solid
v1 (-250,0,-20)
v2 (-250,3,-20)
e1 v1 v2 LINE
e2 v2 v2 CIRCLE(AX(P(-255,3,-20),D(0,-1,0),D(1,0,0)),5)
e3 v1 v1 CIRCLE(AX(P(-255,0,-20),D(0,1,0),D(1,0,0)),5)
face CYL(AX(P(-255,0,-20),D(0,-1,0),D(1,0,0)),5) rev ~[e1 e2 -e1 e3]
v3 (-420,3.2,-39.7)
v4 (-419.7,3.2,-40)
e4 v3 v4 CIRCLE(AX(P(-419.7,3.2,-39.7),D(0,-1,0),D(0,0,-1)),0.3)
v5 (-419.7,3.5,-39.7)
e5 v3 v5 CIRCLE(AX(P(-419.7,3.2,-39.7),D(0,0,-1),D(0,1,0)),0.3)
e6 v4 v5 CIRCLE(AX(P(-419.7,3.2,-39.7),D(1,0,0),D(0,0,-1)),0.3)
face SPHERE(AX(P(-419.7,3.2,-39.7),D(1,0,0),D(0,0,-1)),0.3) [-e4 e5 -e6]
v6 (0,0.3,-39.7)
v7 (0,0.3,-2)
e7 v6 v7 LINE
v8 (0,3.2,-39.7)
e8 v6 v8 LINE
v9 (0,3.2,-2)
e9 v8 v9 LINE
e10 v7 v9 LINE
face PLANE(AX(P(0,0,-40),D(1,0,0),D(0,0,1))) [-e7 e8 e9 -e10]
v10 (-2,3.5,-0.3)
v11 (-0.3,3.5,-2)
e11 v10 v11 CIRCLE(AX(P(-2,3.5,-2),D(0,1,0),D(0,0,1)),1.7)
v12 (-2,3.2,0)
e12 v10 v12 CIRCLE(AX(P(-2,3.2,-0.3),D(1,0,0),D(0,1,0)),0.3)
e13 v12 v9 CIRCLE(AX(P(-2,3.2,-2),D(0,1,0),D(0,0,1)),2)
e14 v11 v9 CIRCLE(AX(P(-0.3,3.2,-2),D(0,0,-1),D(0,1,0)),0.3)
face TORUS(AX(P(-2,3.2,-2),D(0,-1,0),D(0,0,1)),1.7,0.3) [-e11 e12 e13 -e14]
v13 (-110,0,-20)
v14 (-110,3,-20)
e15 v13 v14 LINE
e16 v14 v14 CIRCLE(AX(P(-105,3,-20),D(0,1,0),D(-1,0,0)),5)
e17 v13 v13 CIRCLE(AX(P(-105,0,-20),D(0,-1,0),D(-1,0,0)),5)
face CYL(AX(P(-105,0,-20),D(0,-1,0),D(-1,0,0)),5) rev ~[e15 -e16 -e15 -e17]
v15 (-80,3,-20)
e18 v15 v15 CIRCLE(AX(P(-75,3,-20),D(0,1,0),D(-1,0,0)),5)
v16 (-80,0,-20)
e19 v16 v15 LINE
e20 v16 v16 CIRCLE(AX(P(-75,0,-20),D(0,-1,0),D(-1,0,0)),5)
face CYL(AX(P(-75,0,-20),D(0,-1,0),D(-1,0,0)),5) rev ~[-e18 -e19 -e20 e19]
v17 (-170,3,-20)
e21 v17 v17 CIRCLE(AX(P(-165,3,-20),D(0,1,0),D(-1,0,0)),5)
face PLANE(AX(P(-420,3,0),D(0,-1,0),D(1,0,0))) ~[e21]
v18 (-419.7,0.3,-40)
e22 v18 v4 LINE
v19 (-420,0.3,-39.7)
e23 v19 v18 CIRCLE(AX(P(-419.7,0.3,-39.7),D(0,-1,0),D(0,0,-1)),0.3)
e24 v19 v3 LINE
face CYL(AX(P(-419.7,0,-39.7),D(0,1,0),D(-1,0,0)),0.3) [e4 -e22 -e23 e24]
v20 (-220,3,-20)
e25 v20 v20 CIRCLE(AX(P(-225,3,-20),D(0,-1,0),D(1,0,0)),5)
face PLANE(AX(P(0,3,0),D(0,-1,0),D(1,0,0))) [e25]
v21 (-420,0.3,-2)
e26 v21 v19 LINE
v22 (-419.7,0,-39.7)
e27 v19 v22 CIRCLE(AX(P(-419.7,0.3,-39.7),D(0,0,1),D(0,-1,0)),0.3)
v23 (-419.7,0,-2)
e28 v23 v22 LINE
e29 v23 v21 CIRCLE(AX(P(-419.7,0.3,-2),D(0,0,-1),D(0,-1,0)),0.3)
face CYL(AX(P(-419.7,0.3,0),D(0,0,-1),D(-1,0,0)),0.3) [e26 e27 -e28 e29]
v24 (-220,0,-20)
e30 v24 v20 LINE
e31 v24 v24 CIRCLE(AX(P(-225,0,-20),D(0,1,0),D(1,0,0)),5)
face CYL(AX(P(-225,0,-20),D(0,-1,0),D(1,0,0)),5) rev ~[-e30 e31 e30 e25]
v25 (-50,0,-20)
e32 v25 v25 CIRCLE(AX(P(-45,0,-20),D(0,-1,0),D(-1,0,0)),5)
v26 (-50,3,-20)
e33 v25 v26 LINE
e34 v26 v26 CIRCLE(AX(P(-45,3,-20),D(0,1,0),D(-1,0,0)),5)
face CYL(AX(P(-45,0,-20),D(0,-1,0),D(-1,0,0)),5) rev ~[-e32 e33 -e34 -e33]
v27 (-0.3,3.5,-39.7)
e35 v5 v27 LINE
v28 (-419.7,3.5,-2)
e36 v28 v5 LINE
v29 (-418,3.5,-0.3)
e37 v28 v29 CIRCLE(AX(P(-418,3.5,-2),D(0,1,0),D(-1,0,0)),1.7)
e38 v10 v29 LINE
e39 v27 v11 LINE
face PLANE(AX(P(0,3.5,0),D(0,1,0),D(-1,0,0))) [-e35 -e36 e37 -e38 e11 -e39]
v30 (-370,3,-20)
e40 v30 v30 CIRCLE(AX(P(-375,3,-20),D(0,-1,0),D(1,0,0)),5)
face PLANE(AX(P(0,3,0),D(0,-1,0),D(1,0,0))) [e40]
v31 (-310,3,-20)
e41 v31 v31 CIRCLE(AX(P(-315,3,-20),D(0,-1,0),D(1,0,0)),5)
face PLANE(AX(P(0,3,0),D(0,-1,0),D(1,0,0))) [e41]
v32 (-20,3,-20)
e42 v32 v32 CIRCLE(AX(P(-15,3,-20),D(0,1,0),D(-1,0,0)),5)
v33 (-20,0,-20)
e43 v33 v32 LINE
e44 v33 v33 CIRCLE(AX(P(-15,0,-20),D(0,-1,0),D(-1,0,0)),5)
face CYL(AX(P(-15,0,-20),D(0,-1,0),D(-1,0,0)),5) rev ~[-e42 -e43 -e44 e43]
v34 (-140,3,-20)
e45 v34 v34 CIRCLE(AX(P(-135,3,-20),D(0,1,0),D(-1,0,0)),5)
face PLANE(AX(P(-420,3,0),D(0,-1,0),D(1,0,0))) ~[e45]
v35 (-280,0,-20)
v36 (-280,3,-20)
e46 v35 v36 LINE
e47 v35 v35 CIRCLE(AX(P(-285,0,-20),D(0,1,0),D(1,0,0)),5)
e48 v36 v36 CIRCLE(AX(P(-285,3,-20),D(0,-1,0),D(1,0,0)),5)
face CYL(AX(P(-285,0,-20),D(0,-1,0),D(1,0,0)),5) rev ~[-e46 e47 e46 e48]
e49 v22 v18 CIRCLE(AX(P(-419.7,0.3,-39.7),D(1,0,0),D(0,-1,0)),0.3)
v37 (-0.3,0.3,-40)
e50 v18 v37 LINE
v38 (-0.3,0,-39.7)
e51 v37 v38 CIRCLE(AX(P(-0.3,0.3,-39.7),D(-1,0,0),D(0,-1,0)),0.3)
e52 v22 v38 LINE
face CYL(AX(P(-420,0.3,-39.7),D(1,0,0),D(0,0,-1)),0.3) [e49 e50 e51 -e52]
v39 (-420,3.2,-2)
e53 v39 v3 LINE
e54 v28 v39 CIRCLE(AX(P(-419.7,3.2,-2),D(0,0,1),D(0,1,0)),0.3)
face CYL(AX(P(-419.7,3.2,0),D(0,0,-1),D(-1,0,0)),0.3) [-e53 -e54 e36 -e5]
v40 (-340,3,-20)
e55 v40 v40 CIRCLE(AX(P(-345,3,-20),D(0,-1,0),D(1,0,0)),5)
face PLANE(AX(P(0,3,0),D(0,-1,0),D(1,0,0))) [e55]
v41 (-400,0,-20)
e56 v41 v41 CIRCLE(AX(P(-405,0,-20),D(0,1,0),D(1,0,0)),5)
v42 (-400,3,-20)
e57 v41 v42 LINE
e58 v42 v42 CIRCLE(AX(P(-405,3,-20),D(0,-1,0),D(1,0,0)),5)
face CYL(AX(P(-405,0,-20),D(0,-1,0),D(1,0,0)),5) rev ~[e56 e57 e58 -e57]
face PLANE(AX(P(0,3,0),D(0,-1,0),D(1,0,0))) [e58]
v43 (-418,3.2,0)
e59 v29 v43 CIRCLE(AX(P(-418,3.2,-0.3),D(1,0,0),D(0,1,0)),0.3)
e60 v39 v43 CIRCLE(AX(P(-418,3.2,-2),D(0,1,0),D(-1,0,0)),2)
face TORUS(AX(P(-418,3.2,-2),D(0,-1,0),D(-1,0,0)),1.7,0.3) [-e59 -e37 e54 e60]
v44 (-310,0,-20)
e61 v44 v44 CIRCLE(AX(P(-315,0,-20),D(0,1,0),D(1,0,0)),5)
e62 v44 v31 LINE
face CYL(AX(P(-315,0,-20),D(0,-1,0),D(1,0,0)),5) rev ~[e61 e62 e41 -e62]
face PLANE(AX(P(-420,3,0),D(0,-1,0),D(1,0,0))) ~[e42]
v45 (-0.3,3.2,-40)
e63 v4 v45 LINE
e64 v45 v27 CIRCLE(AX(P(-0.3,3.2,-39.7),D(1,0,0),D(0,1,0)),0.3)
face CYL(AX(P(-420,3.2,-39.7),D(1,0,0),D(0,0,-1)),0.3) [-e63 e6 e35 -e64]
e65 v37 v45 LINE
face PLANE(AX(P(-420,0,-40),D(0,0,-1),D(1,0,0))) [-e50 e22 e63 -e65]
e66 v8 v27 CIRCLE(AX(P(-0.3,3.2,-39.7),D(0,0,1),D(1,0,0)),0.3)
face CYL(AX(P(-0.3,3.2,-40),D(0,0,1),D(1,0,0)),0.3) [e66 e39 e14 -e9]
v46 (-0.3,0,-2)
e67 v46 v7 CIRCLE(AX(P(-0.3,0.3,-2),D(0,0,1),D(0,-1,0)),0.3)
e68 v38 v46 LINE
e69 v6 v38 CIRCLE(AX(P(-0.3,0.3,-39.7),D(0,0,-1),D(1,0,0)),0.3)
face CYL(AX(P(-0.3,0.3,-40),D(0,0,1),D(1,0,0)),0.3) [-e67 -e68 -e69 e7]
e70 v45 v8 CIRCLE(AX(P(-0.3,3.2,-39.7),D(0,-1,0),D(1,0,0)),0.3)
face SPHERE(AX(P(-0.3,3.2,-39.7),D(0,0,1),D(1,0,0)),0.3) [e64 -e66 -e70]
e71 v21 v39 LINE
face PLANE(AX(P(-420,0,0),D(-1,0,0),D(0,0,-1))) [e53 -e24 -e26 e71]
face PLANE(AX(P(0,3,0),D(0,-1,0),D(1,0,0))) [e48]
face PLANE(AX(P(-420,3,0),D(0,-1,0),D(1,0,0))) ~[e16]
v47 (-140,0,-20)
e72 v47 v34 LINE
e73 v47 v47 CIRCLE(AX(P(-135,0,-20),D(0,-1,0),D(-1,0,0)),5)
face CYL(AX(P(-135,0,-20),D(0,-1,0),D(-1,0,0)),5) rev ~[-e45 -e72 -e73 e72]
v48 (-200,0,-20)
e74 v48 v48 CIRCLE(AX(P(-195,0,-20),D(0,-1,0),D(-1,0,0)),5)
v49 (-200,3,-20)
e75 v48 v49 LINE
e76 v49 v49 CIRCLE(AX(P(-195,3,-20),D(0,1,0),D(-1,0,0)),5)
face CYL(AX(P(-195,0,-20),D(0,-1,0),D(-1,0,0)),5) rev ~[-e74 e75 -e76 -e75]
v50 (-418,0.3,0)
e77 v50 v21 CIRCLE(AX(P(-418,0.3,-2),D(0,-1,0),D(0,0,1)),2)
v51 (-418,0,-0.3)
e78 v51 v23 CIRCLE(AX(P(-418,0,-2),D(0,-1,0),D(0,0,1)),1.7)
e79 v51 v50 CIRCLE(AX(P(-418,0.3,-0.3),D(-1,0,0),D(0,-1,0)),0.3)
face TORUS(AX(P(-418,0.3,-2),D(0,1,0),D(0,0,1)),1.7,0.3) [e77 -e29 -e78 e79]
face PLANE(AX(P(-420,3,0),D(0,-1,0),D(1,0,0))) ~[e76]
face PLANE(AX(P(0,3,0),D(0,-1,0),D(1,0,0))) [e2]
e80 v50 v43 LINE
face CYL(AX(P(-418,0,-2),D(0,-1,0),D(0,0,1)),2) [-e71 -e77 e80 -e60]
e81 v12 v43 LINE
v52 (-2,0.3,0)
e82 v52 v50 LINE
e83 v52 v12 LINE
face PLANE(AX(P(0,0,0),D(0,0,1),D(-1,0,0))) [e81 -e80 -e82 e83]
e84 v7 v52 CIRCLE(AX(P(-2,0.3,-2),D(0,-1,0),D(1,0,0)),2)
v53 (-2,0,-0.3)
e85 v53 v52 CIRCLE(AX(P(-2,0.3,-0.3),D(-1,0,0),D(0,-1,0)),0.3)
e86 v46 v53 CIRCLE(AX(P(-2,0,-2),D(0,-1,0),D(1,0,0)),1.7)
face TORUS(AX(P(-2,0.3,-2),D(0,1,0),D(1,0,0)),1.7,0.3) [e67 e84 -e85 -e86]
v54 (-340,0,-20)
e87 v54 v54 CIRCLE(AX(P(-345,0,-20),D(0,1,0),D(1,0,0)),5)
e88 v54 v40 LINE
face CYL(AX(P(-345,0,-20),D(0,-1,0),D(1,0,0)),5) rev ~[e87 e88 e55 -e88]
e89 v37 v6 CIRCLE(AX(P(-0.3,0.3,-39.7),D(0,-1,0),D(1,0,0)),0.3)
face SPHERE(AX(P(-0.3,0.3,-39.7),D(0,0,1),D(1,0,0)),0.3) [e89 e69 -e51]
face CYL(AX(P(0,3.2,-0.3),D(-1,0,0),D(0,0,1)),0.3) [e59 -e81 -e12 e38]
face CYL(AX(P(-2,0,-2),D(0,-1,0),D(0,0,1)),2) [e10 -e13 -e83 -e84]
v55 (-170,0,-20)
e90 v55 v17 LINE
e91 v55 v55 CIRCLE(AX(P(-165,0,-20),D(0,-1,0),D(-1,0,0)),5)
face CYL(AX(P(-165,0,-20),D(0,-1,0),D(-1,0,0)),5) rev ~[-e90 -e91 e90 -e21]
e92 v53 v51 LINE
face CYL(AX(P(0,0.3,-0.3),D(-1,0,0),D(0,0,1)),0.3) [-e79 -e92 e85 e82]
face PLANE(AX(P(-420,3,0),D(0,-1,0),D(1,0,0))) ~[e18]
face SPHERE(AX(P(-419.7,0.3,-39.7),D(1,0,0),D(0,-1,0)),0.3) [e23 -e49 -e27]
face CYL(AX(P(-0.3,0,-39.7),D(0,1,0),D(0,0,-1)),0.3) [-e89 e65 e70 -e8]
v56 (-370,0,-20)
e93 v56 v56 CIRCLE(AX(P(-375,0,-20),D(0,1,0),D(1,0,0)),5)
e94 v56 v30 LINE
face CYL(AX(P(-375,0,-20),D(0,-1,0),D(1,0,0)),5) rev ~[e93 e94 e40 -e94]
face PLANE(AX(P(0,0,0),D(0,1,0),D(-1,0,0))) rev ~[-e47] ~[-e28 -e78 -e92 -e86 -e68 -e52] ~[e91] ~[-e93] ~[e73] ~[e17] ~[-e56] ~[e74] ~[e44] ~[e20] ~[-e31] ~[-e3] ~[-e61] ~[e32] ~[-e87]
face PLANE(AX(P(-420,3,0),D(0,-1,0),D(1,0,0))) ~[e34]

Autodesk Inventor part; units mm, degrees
ref_plane "YZ Plane" through (0, 0, 0) normal (1, 0, 0) x (0, 1, 0)
ref_plane "XZ Plane" through (0, 0, 0) normal (0, 1, 0) x (-1, 0, 0)
sketch "Sketch1" plane through (0, 0, 0) normal (0, 1, 0) x (-1, 0, 0)
  line L0 (0, 0) -> (420, 0)
  line L1 (420, 0) -> (420, -40)
  line L2 (420, -40) -> (0, -40)
  line L3 (0, -40) -> (0, 0)
  dimension "d0" = 420
  dimension "d1" = 40
extrude "Extrusion1" add sketch "Sketch1" along normal blind 3.5
fillet "Fillet1" radius 0.3 10 edges at (-210, 3.5, 0) (-210, 0, 0) (0, 0, -20) (0, 3.5, -20) (0, 1.75, -40) (-210, 3.5, -40) (-210, 0, -40) (-420, 0, -20) (-420, 1.75, -40) (-420, 3.5, -20)
sketch "Sketch2" plane through (0, 0, 0) normal (0, -1, 0) x (1, 0, 0)
  line L0 (-419.7, -39.7) -> (-419.7, -0.3) projected
  line L1 (-419.7, -20) -> (0, -20)
  circle A0 centre (-405, -20) radius 5
  circle A1 centre (-375, -20) radius 5
  circle A2 centre (-345, -20) radius 5
  circle A3 centre (-315, -20) radius 5
  line L2 (-420, 0) -> (-420, -39.7) projected
  line L3 (-315, -20) -> (-315, -8.0411)
  line L4 (-210.3, -20) -> (-630, -20)
  circle A4 centre (-225, -20) radius 5
  circle A5 centre (-255, -20) radius 5
  circle A6 centre (-285, -20) radius 5
  point P0 (0, 0)
  point P1 (-420, -0.3)
  dimension "d5" = 10
  dimension "d6" = 10
  dimension "d7" = 10
  dimension "d8" = 10
  dimension "d9" = 15
  dimension "d10" = 30
  dimension "d11" = 30
  dimension "d12" = 30
ref_plane "Work Plane1" through (-210, 0.3, -39.7) normal (1, 0, 0) x (0, 0, -1)
extrude "Extrusion2" cut sketch "Sketch2" against normal blind 3
mirror "Mirror1" about plane through (-210, 0.3, -39.7) normal (1, 0, 0) of "Extrusion2"
fillet "Fillet2" radius 2 6 edges at (-0.0879, 3.4121, -0.0879) (-0.0879, 0.0879, -0.0879) (0, 1.75, 0) (-419.9121, 3.4121, -0.0879) (-419.9121, 0.0879, -0.0879) (-420, 1.75, 0)
properties part number "LeftClamo"
